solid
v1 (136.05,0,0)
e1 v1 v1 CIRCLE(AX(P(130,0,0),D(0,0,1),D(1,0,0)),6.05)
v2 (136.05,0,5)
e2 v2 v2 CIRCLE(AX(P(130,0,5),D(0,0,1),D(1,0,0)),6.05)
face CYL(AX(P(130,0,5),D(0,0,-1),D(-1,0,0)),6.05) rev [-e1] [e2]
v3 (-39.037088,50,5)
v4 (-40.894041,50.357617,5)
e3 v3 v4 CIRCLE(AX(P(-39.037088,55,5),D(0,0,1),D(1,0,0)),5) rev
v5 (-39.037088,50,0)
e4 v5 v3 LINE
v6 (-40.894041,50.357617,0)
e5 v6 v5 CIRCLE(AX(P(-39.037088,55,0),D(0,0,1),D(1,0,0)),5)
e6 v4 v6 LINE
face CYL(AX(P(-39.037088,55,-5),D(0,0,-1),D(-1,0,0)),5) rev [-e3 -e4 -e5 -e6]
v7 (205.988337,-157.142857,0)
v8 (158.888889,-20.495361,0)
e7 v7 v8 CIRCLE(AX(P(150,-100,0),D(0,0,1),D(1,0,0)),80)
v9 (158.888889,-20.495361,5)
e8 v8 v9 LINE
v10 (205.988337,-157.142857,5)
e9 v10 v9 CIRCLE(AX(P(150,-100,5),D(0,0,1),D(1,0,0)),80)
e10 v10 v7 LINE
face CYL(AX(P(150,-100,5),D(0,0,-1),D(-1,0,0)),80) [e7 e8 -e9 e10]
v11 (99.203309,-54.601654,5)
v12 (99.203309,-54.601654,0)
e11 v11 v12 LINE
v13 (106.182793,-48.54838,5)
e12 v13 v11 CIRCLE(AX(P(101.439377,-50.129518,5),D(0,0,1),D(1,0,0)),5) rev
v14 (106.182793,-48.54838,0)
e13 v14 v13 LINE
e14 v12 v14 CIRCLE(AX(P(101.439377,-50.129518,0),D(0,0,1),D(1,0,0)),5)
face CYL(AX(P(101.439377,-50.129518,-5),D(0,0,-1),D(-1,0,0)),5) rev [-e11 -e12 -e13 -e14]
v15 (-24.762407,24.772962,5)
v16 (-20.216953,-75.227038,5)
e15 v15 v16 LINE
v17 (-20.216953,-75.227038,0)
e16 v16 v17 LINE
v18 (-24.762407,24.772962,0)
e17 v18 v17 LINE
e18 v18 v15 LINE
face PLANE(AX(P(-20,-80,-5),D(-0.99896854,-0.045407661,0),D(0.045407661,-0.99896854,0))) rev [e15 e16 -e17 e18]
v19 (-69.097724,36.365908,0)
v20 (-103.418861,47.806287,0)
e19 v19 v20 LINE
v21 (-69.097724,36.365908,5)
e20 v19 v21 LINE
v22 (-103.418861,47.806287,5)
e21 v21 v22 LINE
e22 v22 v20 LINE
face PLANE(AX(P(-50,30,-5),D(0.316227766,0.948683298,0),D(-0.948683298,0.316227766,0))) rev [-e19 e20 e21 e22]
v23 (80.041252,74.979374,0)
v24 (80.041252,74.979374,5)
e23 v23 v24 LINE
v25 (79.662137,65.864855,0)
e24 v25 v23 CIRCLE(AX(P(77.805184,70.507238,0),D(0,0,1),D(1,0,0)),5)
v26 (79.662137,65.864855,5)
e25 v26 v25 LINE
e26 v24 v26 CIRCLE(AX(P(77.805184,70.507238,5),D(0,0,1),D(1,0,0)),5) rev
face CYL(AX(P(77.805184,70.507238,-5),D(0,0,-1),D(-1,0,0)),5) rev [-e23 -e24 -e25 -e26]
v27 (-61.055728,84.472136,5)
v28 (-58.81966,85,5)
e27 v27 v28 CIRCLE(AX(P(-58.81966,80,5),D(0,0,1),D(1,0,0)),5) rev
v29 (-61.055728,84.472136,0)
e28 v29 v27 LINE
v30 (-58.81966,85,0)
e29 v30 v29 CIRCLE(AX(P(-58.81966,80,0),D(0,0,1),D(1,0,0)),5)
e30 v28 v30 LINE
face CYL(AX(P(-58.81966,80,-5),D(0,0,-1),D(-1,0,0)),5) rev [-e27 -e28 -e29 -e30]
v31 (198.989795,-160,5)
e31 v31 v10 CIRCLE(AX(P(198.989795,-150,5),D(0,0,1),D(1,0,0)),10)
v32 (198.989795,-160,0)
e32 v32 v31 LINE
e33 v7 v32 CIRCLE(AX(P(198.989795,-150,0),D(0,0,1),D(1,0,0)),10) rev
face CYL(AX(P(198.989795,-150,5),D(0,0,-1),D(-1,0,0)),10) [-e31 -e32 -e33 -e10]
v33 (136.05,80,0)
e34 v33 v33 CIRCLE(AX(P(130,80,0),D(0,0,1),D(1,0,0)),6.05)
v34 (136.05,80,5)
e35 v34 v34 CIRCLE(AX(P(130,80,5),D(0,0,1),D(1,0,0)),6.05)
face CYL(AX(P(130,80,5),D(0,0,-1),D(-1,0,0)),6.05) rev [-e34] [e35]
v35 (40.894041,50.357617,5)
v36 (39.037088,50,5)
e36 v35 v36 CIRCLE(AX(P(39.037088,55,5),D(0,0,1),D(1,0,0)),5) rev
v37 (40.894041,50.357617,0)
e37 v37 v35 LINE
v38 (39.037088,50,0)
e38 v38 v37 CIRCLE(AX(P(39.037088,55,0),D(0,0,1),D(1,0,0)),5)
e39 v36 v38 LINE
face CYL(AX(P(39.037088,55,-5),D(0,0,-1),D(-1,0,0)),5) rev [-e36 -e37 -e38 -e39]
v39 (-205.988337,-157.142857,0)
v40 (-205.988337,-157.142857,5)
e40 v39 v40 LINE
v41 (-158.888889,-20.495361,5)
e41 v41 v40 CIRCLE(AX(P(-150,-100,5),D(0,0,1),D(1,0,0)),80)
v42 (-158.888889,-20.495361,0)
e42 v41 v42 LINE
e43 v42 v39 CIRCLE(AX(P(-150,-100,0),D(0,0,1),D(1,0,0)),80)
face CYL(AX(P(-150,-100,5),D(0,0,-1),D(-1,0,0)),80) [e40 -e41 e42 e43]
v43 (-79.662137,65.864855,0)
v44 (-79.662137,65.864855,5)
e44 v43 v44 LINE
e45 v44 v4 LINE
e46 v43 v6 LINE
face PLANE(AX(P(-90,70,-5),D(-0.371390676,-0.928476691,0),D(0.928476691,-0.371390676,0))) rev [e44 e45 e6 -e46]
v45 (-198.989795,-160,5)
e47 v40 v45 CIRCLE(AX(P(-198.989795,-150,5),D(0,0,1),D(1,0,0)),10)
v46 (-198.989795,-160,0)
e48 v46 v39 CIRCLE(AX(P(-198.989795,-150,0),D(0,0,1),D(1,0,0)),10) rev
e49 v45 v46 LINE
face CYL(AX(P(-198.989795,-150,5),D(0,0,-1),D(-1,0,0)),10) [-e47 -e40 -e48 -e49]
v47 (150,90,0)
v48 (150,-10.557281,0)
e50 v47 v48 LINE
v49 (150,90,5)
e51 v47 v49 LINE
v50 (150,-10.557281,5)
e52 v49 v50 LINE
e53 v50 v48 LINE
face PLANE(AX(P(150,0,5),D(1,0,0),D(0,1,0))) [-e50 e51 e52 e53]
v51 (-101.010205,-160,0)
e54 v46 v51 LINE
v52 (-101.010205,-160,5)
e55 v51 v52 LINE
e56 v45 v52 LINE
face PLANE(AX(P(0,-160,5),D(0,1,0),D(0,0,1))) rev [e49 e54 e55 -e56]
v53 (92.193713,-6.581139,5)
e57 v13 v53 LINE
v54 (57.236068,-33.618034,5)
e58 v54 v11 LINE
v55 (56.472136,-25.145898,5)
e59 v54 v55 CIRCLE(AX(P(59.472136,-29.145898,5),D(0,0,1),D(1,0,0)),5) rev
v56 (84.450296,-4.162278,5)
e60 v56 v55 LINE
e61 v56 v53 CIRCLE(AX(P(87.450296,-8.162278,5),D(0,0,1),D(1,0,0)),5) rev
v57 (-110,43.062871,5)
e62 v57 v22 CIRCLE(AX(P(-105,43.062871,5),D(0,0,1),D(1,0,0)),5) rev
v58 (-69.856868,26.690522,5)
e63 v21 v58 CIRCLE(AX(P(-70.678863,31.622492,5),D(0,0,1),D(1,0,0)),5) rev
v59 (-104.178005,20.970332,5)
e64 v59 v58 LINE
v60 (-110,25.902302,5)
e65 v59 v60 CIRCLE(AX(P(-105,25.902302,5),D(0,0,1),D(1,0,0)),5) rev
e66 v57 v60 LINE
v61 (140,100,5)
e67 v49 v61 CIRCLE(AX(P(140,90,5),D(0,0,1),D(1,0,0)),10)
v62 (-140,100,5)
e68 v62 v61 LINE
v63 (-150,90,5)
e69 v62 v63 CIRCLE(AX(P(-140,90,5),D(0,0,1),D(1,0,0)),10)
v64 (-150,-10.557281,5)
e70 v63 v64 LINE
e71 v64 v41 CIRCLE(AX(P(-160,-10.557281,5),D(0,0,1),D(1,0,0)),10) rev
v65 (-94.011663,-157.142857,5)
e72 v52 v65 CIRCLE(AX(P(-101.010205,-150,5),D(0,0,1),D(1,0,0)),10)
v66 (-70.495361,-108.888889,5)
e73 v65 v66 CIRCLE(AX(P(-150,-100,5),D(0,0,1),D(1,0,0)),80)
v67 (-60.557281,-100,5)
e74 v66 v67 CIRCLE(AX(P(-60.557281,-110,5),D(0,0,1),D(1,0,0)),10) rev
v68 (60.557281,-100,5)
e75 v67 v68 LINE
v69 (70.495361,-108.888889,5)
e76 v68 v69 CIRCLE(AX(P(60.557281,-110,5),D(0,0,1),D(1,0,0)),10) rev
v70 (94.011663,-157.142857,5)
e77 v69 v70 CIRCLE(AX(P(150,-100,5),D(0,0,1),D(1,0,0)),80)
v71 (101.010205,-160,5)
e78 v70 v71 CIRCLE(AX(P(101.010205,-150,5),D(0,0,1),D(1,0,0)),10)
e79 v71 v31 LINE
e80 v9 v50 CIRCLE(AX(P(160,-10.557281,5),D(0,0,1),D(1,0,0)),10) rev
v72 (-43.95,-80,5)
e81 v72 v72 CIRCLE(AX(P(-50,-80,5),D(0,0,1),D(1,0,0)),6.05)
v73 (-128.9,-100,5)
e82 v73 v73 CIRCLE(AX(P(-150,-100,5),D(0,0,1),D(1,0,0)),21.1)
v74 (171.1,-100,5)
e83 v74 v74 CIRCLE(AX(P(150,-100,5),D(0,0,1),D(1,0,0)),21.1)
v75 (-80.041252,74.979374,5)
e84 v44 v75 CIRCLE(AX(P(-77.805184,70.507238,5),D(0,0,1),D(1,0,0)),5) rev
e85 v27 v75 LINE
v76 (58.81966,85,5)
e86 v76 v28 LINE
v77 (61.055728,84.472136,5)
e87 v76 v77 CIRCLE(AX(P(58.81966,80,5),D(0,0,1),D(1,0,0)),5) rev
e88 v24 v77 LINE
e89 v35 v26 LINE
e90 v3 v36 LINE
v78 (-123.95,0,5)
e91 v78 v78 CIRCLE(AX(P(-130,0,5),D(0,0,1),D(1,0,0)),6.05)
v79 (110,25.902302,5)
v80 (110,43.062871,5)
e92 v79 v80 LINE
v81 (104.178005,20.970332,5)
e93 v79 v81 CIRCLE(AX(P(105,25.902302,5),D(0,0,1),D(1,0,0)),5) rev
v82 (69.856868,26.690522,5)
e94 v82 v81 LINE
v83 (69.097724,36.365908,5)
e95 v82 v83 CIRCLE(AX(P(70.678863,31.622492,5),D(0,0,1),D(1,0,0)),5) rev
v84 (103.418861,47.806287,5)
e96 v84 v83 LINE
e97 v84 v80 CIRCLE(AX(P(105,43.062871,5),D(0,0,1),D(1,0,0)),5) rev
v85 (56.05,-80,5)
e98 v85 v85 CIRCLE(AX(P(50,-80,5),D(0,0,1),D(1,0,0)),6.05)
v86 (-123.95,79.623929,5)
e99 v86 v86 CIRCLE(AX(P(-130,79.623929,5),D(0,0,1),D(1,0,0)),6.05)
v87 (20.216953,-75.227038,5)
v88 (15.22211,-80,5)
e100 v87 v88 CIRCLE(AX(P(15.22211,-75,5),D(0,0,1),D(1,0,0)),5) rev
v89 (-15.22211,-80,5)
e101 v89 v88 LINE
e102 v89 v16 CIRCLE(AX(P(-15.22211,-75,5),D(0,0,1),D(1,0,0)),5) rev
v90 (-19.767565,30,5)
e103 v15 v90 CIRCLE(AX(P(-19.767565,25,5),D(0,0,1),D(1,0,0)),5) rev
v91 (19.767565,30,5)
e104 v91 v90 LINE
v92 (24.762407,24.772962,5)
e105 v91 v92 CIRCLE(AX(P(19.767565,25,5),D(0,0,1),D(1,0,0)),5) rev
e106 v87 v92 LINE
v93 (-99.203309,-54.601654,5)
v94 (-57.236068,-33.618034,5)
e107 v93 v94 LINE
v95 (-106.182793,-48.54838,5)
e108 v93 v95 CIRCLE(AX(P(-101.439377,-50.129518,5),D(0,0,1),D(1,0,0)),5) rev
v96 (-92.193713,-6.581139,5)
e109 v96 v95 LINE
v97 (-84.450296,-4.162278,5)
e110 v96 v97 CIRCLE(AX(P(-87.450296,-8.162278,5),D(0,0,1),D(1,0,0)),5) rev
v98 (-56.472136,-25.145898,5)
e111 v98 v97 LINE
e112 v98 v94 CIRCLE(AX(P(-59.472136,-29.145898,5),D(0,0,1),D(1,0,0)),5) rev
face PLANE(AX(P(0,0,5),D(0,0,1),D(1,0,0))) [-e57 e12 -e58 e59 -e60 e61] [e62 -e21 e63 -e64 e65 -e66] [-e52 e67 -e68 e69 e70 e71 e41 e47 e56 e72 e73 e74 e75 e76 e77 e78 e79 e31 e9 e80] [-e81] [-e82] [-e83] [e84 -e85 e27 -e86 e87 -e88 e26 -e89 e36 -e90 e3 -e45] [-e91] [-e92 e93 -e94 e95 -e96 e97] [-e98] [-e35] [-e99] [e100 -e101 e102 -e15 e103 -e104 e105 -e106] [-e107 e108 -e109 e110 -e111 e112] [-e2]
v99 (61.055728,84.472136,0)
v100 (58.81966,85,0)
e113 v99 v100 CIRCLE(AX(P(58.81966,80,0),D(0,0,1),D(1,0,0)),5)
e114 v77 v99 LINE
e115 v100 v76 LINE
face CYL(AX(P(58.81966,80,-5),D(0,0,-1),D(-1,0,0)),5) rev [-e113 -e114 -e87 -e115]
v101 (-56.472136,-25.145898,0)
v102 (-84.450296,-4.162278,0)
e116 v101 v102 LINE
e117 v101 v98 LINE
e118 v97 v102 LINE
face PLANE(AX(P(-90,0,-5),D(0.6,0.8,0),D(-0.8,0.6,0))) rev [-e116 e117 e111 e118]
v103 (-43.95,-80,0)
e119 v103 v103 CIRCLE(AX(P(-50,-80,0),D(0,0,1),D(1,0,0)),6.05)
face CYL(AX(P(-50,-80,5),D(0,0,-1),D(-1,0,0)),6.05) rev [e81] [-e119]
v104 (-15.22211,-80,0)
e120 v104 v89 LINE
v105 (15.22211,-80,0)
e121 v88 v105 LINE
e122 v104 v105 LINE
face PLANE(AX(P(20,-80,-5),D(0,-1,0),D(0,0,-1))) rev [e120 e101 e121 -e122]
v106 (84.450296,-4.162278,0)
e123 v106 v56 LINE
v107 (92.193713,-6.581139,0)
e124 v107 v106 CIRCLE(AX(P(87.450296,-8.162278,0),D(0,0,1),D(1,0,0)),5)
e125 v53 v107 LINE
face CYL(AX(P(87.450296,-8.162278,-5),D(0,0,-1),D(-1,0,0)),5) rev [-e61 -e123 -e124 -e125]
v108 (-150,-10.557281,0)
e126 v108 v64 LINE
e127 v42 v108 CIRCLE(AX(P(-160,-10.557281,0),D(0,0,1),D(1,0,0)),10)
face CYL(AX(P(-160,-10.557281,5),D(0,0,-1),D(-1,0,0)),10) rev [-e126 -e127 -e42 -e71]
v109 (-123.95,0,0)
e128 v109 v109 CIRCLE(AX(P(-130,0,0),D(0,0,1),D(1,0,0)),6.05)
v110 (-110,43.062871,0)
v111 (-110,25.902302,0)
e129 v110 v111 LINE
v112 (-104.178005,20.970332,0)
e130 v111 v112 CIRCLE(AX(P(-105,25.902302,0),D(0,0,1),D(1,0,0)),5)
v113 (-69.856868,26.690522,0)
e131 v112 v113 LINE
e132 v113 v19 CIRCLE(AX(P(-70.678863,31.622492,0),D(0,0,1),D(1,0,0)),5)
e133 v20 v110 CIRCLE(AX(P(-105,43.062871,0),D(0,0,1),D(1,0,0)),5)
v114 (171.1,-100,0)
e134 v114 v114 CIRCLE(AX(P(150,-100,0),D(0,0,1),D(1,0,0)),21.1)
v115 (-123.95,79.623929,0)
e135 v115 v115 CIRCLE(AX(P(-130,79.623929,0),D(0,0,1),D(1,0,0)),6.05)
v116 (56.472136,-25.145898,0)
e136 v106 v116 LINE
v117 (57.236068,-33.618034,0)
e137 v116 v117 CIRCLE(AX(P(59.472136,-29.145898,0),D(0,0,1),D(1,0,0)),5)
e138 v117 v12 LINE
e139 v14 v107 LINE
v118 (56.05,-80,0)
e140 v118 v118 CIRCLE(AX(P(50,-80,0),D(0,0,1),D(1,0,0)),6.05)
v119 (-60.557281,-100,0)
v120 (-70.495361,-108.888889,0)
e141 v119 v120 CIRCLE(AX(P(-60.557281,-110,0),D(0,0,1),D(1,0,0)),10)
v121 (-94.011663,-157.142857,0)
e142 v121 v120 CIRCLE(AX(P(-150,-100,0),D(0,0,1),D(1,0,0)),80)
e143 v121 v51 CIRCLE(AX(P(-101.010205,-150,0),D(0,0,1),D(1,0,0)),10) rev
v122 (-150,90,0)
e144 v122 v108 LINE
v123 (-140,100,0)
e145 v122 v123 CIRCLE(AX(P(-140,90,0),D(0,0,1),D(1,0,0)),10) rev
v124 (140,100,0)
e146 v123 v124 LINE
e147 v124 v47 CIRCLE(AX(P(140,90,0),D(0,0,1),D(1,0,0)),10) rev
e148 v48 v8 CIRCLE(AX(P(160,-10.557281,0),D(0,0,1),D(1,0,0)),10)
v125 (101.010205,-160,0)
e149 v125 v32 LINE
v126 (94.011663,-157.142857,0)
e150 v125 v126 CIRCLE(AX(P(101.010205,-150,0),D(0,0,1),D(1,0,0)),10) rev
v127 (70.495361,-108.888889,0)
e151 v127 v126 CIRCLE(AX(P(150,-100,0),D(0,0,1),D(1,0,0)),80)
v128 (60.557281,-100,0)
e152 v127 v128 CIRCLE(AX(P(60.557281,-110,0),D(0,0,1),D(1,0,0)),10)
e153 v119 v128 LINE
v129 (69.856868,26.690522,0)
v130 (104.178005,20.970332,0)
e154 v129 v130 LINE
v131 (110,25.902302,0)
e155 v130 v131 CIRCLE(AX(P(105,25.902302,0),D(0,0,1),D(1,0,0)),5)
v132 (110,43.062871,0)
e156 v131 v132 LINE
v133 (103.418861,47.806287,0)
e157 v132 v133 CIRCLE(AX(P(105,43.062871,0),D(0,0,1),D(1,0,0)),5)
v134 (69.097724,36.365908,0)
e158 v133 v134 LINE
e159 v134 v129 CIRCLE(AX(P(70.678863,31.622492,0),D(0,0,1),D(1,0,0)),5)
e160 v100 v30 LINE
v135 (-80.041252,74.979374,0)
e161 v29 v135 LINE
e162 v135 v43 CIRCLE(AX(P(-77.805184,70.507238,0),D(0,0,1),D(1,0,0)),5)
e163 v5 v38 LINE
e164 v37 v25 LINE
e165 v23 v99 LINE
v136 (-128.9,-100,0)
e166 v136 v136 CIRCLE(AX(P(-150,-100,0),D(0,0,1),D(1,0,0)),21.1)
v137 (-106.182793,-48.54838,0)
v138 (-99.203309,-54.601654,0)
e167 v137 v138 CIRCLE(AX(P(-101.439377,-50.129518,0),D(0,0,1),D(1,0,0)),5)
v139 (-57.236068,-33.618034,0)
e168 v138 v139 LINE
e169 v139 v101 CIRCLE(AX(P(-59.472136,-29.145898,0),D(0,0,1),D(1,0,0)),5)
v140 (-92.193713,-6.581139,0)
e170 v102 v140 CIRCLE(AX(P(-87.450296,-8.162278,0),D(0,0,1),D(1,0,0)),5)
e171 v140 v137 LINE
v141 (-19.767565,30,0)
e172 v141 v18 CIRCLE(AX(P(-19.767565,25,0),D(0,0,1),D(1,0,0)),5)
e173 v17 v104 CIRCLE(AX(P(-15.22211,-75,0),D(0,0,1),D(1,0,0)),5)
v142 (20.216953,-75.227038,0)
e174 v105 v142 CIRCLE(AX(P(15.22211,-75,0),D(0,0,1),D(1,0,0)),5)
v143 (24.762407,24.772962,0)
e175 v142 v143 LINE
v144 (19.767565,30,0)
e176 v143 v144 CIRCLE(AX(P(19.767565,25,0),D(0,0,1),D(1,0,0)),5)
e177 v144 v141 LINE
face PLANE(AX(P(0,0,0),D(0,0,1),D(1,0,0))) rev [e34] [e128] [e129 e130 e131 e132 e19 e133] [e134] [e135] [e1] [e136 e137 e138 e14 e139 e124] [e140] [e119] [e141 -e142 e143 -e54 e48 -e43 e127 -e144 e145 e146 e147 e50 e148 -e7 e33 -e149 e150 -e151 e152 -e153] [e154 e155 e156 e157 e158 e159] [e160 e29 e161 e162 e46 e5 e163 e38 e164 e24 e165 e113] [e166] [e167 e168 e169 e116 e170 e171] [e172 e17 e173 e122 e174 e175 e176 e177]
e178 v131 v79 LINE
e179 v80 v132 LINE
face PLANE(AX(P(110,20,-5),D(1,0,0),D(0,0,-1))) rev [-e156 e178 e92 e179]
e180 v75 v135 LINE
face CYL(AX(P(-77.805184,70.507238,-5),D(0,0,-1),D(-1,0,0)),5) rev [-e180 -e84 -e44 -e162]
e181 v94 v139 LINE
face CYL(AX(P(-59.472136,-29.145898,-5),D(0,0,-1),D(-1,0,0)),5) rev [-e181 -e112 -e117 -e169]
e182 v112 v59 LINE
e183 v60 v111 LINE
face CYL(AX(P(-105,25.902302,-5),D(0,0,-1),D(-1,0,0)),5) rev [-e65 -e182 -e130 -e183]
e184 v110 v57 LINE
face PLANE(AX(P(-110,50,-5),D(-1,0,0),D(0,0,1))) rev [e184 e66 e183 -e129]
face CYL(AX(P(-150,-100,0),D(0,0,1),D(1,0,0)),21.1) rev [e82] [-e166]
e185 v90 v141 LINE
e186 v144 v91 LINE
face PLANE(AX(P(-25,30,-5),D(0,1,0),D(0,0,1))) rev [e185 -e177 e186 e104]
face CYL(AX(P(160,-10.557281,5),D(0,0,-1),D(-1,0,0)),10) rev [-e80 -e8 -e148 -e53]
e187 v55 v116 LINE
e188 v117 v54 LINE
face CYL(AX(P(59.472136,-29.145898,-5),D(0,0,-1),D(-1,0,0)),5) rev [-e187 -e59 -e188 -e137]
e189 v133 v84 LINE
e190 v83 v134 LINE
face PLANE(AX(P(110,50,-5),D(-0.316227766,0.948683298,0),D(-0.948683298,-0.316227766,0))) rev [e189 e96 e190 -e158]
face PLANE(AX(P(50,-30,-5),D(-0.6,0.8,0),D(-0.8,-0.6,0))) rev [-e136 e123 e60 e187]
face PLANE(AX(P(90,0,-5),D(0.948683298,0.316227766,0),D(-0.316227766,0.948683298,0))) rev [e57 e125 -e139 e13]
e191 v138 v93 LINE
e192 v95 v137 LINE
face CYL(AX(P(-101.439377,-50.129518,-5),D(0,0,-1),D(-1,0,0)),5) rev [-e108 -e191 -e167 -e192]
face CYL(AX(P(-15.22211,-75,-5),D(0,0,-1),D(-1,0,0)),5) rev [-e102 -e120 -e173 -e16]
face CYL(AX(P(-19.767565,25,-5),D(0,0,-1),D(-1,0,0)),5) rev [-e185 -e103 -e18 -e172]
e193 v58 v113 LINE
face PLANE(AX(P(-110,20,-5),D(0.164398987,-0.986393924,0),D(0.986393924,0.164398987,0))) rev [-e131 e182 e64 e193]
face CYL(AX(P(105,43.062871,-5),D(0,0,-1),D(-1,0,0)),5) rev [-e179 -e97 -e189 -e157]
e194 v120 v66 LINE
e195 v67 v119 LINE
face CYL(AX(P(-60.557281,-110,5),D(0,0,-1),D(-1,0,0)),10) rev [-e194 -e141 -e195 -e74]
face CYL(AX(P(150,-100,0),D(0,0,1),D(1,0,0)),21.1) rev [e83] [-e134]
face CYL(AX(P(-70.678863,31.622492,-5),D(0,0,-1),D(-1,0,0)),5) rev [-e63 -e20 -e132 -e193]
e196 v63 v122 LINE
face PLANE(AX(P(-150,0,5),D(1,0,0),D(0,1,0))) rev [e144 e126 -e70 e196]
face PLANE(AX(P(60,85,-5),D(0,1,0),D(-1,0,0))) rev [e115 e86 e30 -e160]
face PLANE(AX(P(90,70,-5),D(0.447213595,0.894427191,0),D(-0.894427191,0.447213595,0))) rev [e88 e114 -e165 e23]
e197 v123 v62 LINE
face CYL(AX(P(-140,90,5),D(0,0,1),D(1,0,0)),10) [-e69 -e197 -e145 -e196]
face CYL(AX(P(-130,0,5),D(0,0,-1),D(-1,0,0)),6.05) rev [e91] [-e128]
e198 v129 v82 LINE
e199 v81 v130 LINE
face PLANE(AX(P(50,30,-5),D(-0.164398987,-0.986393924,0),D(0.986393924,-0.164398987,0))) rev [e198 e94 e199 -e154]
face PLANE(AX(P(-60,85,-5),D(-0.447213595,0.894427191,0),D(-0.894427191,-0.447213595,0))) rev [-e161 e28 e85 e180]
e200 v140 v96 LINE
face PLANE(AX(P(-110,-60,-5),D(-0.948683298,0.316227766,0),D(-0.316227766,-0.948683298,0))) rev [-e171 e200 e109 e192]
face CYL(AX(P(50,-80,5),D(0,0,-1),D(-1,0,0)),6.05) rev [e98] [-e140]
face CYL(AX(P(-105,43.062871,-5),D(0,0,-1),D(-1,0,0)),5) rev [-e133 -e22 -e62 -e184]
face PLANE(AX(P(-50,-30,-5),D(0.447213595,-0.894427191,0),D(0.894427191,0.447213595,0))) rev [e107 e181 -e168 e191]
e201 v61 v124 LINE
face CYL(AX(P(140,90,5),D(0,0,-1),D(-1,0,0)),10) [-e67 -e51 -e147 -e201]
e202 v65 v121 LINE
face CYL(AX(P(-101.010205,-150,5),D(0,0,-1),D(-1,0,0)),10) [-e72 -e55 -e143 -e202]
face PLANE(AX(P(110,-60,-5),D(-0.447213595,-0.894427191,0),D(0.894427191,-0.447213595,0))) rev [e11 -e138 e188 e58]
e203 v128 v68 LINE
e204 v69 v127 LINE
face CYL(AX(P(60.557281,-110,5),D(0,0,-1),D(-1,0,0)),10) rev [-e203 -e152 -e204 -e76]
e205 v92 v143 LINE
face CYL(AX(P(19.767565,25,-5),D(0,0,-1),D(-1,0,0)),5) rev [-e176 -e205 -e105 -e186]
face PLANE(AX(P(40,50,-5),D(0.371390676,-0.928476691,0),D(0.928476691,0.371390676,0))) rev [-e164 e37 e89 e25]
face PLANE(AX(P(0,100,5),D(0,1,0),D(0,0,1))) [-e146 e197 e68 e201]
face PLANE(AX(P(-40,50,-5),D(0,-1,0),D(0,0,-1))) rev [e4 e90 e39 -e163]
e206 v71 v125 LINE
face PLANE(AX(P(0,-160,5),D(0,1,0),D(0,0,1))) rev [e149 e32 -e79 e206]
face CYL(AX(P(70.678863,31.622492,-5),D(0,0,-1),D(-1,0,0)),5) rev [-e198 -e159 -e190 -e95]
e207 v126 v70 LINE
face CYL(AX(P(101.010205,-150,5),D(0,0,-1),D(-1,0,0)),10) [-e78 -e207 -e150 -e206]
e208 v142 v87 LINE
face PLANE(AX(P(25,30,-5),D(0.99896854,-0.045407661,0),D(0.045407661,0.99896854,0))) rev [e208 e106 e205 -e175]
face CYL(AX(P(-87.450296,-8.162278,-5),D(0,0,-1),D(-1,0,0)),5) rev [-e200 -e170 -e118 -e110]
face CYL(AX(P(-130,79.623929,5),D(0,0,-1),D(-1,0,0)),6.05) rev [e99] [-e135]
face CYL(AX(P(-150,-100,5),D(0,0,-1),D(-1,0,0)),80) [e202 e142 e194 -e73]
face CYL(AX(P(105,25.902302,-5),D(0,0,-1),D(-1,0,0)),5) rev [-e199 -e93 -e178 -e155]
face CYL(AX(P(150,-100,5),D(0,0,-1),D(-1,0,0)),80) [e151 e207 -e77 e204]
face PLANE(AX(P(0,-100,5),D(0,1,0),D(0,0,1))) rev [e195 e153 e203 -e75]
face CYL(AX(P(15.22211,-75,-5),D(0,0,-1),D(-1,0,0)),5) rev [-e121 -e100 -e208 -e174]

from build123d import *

# Parameters (mm, degrees)
EXTRUDE_1_OUTLINE_R = 6.05
EXTRUDE_1_DEPTH     = 5
SKETCH_3_R          = 21.1
CUT_EXTRUDE_2_DEPTH = 281.223125384
FILLET_1_R          = 10
FILLET1_R           = 10
CUT_EXTRUDE1_DEPTH  = 10
FILLET2_R           = 5


# Read off the part's stored shape, not the designer's step: 凸台-拉伸1
with BuildPart() as part:
    # 凸台-拉伸1 outline → 凸台-拉伸1 (new body)
    with BuildSketch(Plane.XY):
        with BuildLine():
            ThreePointArc((-97.084973779, -160), (-77.084973779, -132.915026221), (-70, -100))
            Line((-70, -100), (70, -100))
            ThreePointArc((70, -100), (77.084973779, -132.915026221), (97.084973779, -160))
            Line((97.084973779, -160), (202.915026221, -160))
            ThreePointArc((202.915026221, -160), (224.833147735, -71.715728753), (150, -20))
            Line((150, -20), (150, 100))
            Line((150, 100), (-150, 100))
            Line((-150, 100), (-150, -20))
            ThreePointArc((-150, -20), (-224.833147735, -71.715728753), (-202.915026221, -160))
            Line((-202.915026221, -160), (-97.084973779, -160))
        make_face()
        with Locations((-50, -80)):
            Circle(EXTRUDE_1_OUTLINE_R, mode=Mode.SUBTRACT)
        with Locations((50, -80)):
            Circle(EXTRUDE_1_OUTLINE_R, mode=Mode.SUBTRACT)
        with Locations((-130, 0)):
            Circle(EXTRUDE_1_OUTLINE_R, mode=Mode.SUBTRACT)
        with Locations((-130, 79.62392947)):
            Circle(EXTRUDE_1_OUTLINE_R, mode=Mode.SUBTRACT)
        with Locations((130, 0)):
            Circle(EXTRUDE_1_OUTLINE_R, mode=Mode.SUBTRACT)
        with Locations((130, 80)):
            Circle(EXTRUDE_1_OUTLINE_R, mode=Mode.SUBTRACT)
    extrude(amount=EXTRUDE_1_DEPTH)

    # 草图3 → 切除-拉伸2 (cut, through all)
    with BuildSketch(Plane.XY.offset(5)):
        with Locations((-150, -100)):
            Circle(SKETCH_3_R)
        with Locations((150, -100)):
            Circle(SKETCH_3_R)
    extrude(amount=-CUT_EXTRUDE_2_DEPTH, mode=Mode.SUBTRACT)

    # 圆角1
    fillet_1_edges = [part.edges().sort_by_distance(p)[0] for p in [
        (-150, -20, 2.5),
        (-150, 100, 2.5),
        (150, 100, 2.5),
        (150, -20, 2.5),
        (70, -100, 2.5),
        (-70, -100, 2.5),
    ]]
    fillet(fillet_1_edges, radius=FILLET_1_R)

    # Fillet1
    fillet1_edges = [part.edges().sort_by_distance(p)[0] for p in [
        (-97.084973779, -160, 2.5),
        (-202.915026221, -160, 2.5),
        (202.915026221, -160, 2.5),
        (97.084973779, -160, 2.5),
    ]]
    fillet(fillet1_edges, radius=FILLET1_R)

    # Sketch3 → Cut-Extrude1 (cut)
    with BuildSketch(Plane.XY.offset(5)):
        Polygon((-90, 70), (-40, 50), (40, 50), (90, 70), (60, 85), (-60, 85), align=None)
        Polygon((-110, 50), (-110, 20), (-50, 30), align=None)
        Polygon((50, 30), (110, 20), (110, 50), align=None)
        Polygon((-25, 30), (25, 30), (20, -80), (-20, -80), align=None)
        Polygon((-90, 0), (-50, -30), (-110, -60), align=None)
        Polygon((50, -30), (90, 0), (110, -60), align=None)
    extrude(amount=-CUT_EXTRUDE1_DEPTH, mode=Mode.SUBTRACT)

    # Fillet2
    fillet2_edges = [part.edges().sort_by_distance(p)[0] for p in [
        (-110, -60, 2.5),
        (-90, 0, 2.5),
        (-50, -30, 2.5),
        (50, 30, 2.5),
        (110, 50, 2.5),
        (110, 20, 2.5),
        (-110, 50, 2.5),
        (-50, 30, 2.5),
        (-110, 20, 2.5),
        (-20, -80, 2.5),
        (-25, 30, 2.5),
        (25, 30, 2.5),
        (20, -80, 2.5),
        (110, -60, 2.5),
        (50, -30, 2.5),
        (90, 0, 2.5),
        (-90, 70, 2.5),
        (-60, 85, 2.5),
        (60, 85, 2.5),
        (90, 70, 2.5),
        (40, 50, 2.5),
        (-40, 50, 2.5),
    ]]
    fillet(fillet2_edges, radius=FILLET2_R)


solid = part.part
